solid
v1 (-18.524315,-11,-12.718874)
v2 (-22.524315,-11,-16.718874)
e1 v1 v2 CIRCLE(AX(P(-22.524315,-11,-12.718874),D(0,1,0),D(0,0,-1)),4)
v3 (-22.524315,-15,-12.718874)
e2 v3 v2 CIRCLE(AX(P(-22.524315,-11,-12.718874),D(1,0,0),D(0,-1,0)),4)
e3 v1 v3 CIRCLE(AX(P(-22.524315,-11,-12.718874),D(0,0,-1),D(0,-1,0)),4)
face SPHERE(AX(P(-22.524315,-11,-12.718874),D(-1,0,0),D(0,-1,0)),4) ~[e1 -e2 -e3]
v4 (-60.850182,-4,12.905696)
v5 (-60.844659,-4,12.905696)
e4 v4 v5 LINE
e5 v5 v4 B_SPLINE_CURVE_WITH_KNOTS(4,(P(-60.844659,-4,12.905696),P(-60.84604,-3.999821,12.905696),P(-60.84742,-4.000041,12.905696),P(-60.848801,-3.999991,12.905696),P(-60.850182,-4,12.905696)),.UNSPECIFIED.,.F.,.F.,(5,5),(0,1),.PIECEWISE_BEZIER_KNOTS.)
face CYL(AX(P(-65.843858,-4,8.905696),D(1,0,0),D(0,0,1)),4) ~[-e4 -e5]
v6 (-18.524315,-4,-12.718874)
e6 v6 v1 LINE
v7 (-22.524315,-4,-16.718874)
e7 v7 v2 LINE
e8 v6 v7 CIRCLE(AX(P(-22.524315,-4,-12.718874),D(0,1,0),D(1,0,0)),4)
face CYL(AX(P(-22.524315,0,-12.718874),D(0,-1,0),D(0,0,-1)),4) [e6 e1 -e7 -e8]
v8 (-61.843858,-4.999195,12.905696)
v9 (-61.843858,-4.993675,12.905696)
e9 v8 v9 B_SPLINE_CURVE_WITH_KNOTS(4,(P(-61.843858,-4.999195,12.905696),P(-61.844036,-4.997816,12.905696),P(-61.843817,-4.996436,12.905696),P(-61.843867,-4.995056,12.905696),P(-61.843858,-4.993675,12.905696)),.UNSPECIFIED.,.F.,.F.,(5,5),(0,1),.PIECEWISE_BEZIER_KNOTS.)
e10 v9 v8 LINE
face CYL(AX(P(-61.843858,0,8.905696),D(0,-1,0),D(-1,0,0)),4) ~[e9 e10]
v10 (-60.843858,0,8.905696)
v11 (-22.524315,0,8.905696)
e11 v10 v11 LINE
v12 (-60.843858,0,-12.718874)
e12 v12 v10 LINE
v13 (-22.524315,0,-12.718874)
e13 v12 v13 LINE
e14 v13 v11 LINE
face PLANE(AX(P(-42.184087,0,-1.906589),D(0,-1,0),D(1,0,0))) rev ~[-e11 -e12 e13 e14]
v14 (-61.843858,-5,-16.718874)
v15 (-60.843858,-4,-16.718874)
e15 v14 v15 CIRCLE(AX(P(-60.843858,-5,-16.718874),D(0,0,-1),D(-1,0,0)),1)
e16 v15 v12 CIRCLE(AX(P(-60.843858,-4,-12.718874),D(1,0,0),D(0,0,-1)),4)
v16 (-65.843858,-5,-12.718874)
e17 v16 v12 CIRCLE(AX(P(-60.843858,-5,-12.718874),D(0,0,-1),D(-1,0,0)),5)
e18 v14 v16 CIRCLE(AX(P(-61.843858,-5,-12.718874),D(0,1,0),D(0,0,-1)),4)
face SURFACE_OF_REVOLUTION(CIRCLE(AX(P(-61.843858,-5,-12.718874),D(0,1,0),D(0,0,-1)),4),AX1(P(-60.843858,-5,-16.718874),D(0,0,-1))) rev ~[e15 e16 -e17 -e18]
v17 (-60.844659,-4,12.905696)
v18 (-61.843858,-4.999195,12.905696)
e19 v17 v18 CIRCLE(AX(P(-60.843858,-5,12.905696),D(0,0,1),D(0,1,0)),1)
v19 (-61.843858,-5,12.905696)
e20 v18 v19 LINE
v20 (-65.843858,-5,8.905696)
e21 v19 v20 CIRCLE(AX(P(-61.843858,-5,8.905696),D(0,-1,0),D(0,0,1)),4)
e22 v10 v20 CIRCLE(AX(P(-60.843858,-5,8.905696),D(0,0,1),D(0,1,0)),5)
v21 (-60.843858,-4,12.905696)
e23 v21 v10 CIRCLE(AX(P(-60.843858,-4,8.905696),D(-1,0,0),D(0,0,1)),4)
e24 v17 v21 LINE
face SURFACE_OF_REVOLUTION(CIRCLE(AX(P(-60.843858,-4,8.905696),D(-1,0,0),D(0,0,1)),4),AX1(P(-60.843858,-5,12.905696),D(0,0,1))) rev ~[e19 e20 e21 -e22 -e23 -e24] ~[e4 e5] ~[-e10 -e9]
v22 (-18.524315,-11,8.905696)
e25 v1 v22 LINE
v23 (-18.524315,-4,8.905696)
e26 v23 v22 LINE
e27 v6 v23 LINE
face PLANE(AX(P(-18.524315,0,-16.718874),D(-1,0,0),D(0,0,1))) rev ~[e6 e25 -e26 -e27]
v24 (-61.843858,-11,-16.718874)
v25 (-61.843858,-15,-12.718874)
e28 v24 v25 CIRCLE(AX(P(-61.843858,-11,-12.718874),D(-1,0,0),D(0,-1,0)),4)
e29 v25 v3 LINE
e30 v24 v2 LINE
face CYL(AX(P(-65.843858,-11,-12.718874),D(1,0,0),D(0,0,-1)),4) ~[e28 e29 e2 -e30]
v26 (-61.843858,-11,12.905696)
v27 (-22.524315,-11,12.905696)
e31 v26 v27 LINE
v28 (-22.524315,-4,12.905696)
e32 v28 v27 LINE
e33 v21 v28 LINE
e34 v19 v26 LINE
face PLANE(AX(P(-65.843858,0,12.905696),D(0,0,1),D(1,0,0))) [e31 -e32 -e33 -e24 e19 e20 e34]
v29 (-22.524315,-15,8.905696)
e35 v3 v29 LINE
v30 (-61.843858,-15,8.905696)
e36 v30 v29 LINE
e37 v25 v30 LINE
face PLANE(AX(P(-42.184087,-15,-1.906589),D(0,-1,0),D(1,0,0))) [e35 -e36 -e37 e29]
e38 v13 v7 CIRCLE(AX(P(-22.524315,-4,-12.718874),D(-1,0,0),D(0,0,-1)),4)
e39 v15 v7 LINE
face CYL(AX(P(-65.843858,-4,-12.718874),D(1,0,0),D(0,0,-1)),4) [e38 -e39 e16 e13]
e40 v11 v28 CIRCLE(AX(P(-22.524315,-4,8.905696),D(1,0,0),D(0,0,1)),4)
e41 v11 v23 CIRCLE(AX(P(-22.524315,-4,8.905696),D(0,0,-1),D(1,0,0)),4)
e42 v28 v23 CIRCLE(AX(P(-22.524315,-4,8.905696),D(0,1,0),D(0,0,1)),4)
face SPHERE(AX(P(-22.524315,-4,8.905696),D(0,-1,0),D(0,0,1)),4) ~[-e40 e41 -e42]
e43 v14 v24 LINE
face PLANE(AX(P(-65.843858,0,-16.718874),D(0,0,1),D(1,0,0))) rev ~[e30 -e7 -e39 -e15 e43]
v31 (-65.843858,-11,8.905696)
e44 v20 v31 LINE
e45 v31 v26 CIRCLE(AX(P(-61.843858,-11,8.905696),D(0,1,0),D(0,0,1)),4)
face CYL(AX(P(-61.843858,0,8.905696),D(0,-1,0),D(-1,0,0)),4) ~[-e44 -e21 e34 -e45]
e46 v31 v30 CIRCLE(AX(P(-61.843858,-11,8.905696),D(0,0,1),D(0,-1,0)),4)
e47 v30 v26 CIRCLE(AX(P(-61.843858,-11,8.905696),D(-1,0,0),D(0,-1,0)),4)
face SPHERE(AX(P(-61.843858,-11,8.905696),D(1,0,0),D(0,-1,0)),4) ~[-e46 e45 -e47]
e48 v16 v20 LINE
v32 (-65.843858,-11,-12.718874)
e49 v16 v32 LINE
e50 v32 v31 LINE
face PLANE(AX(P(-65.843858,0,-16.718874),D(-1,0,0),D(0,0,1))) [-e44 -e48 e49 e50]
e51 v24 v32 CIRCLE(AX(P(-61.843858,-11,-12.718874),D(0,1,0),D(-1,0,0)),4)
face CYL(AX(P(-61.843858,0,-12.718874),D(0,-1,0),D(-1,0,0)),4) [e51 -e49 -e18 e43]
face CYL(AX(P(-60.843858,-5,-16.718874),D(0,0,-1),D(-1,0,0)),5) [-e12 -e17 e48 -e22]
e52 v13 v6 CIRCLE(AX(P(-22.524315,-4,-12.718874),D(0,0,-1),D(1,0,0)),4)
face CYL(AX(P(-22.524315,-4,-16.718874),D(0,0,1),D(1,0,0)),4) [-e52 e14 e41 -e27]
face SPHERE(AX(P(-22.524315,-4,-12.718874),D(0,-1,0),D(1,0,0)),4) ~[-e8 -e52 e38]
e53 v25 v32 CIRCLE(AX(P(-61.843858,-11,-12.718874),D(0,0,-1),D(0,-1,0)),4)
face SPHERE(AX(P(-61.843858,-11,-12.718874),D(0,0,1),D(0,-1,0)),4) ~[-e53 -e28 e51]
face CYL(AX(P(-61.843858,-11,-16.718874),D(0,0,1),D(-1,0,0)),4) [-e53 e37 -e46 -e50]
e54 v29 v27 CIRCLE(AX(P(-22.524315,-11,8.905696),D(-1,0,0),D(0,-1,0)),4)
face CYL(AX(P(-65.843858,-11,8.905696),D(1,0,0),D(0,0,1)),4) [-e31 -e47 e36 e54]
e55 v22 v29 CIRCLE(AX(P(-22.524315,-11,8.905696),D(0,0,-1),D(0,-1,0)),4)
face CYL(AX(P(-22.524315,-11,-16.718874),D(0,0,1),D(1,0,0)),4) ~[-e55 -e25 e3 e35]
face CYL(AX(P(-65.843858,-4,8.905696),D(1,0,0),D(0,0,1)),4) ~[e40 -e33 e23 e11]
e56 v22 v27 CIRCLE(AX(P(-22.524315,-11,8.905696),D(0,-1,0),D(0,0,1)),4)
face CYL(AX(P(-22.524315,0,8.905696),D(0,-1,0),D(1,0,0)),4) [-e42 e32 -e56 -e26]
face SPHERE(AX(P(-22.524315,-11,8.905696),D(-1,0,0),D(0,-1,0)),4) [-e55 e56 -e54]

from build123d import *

# Parameters (mm, degrees)
F0_W        = 47.3195426166
F0_H        = 29.6245701611
F1_DEPTH    = 15
F2_R        = 4
F3_T1_DEPTH = 29.6245701611
F3_T4_ANGLE = 90
F3_T6_ANGLE = 90


# Not quite as in the source:
# - a fillet or chamfer that OpenCascade refuses, or shapes differently, is made with other operations: its cross-section is extruded or revolved along the edge and cut away or added


with BuildPart() as f1:
    # F0 (on Front) → F1 (new body)
    with BuildSketch(Plane.XZ):
        with Locations((-42.1840865165, -1.9065886736)):
            Rectangle(F0_W, F0_H)
    extrude(amount=F1_DEPTH)

    # F2
    f2_edges = [f1.edges().sort_by_distance(p)[0] for p in [
        (-42.184087, -15, 12.905696),
        (-65.843858, -15, -1.906589),
        (-42.184087, -15, -16.718874),
        (-18.524315, -15, -1.906589),
        (-18.524315, -7.5, 12.905696),
        (-42.184087, 0, 12.905696),
        (-18.524315, -7.5, -16.718874),
        (-18.524315, 0, -1.906589),
        (-42.184087, 0, -16.718874),
        (-65.843858, -7.5, -16.718874),
        (-65.843858, -7.5, 12.905696),
    ]]
    fillet(f2_edges, radius=F2_R)

    # F3: fillet of radius 5 on 1 edges, made by hand

    # F3_s2 → F3_t1 (cut)
    with BuildSketch(Plane.XY.offset(-16.7188737541)):
        with BuildLine():
            ThreePointArc((-65.8438578248, -5), (-64.3793917307, -1.4644660941), (-60.8438578248, 0))
            Line((-60.8438578248, 0), (-65.8438578248, 0))
            Line((-65.8438578248, 0), (-65.8438578248, -5))
        make_face()
    extrude(amount=F3_T1_DEPTH, mode=Mode.SUBTRACT)

    # F3_s3 → F3_t4 (revolve, cut)
    with BuildSketch(Plane.YZ.offset(-60.8438578248)):
        with BuildLine():
            ThreePointArc((-4, 12.905696407), (-1.1715728753, 11.7341235317), (0, 8.905696407))
            Line((0, 8.905696407), (0, 12.905696407))
            Line((0, 12.905696407), (-4, 12.905696407))
        make_face()
    revolve(axis=Axis((-60.8438578248, -5, 12.905696407), (0, 0, 1)), revolution_arc=F3_T4_ANGLE, mode=Mode.SUBTRACT)

    # F3_s5 → F3_t6 (revolve, cut)
    with BuildSketch(Plane.XZ.offset(5)):
        with BuildLine():
            ThreePointArc((-61.8438578248, -16.7188737541), (-64.6722849495, -15.5473008789), (-65.8438578248, -12.7188737541))
            Line((-65.8438578248, -12.7188737541), (-65.8438578248, -16.7188737541))
            Line((-65.8438578248, -16.7188737541), (-61.8438578248, -16.7188737541))
        make_face()
    revolve(axis=Axis((-60.8438578248, -5, -16.7188737541), (0, 0, -1)), revolution_arc=F3_T6_ANGLE, mode=Mode.SUBTRACT)


solid = f1.part
